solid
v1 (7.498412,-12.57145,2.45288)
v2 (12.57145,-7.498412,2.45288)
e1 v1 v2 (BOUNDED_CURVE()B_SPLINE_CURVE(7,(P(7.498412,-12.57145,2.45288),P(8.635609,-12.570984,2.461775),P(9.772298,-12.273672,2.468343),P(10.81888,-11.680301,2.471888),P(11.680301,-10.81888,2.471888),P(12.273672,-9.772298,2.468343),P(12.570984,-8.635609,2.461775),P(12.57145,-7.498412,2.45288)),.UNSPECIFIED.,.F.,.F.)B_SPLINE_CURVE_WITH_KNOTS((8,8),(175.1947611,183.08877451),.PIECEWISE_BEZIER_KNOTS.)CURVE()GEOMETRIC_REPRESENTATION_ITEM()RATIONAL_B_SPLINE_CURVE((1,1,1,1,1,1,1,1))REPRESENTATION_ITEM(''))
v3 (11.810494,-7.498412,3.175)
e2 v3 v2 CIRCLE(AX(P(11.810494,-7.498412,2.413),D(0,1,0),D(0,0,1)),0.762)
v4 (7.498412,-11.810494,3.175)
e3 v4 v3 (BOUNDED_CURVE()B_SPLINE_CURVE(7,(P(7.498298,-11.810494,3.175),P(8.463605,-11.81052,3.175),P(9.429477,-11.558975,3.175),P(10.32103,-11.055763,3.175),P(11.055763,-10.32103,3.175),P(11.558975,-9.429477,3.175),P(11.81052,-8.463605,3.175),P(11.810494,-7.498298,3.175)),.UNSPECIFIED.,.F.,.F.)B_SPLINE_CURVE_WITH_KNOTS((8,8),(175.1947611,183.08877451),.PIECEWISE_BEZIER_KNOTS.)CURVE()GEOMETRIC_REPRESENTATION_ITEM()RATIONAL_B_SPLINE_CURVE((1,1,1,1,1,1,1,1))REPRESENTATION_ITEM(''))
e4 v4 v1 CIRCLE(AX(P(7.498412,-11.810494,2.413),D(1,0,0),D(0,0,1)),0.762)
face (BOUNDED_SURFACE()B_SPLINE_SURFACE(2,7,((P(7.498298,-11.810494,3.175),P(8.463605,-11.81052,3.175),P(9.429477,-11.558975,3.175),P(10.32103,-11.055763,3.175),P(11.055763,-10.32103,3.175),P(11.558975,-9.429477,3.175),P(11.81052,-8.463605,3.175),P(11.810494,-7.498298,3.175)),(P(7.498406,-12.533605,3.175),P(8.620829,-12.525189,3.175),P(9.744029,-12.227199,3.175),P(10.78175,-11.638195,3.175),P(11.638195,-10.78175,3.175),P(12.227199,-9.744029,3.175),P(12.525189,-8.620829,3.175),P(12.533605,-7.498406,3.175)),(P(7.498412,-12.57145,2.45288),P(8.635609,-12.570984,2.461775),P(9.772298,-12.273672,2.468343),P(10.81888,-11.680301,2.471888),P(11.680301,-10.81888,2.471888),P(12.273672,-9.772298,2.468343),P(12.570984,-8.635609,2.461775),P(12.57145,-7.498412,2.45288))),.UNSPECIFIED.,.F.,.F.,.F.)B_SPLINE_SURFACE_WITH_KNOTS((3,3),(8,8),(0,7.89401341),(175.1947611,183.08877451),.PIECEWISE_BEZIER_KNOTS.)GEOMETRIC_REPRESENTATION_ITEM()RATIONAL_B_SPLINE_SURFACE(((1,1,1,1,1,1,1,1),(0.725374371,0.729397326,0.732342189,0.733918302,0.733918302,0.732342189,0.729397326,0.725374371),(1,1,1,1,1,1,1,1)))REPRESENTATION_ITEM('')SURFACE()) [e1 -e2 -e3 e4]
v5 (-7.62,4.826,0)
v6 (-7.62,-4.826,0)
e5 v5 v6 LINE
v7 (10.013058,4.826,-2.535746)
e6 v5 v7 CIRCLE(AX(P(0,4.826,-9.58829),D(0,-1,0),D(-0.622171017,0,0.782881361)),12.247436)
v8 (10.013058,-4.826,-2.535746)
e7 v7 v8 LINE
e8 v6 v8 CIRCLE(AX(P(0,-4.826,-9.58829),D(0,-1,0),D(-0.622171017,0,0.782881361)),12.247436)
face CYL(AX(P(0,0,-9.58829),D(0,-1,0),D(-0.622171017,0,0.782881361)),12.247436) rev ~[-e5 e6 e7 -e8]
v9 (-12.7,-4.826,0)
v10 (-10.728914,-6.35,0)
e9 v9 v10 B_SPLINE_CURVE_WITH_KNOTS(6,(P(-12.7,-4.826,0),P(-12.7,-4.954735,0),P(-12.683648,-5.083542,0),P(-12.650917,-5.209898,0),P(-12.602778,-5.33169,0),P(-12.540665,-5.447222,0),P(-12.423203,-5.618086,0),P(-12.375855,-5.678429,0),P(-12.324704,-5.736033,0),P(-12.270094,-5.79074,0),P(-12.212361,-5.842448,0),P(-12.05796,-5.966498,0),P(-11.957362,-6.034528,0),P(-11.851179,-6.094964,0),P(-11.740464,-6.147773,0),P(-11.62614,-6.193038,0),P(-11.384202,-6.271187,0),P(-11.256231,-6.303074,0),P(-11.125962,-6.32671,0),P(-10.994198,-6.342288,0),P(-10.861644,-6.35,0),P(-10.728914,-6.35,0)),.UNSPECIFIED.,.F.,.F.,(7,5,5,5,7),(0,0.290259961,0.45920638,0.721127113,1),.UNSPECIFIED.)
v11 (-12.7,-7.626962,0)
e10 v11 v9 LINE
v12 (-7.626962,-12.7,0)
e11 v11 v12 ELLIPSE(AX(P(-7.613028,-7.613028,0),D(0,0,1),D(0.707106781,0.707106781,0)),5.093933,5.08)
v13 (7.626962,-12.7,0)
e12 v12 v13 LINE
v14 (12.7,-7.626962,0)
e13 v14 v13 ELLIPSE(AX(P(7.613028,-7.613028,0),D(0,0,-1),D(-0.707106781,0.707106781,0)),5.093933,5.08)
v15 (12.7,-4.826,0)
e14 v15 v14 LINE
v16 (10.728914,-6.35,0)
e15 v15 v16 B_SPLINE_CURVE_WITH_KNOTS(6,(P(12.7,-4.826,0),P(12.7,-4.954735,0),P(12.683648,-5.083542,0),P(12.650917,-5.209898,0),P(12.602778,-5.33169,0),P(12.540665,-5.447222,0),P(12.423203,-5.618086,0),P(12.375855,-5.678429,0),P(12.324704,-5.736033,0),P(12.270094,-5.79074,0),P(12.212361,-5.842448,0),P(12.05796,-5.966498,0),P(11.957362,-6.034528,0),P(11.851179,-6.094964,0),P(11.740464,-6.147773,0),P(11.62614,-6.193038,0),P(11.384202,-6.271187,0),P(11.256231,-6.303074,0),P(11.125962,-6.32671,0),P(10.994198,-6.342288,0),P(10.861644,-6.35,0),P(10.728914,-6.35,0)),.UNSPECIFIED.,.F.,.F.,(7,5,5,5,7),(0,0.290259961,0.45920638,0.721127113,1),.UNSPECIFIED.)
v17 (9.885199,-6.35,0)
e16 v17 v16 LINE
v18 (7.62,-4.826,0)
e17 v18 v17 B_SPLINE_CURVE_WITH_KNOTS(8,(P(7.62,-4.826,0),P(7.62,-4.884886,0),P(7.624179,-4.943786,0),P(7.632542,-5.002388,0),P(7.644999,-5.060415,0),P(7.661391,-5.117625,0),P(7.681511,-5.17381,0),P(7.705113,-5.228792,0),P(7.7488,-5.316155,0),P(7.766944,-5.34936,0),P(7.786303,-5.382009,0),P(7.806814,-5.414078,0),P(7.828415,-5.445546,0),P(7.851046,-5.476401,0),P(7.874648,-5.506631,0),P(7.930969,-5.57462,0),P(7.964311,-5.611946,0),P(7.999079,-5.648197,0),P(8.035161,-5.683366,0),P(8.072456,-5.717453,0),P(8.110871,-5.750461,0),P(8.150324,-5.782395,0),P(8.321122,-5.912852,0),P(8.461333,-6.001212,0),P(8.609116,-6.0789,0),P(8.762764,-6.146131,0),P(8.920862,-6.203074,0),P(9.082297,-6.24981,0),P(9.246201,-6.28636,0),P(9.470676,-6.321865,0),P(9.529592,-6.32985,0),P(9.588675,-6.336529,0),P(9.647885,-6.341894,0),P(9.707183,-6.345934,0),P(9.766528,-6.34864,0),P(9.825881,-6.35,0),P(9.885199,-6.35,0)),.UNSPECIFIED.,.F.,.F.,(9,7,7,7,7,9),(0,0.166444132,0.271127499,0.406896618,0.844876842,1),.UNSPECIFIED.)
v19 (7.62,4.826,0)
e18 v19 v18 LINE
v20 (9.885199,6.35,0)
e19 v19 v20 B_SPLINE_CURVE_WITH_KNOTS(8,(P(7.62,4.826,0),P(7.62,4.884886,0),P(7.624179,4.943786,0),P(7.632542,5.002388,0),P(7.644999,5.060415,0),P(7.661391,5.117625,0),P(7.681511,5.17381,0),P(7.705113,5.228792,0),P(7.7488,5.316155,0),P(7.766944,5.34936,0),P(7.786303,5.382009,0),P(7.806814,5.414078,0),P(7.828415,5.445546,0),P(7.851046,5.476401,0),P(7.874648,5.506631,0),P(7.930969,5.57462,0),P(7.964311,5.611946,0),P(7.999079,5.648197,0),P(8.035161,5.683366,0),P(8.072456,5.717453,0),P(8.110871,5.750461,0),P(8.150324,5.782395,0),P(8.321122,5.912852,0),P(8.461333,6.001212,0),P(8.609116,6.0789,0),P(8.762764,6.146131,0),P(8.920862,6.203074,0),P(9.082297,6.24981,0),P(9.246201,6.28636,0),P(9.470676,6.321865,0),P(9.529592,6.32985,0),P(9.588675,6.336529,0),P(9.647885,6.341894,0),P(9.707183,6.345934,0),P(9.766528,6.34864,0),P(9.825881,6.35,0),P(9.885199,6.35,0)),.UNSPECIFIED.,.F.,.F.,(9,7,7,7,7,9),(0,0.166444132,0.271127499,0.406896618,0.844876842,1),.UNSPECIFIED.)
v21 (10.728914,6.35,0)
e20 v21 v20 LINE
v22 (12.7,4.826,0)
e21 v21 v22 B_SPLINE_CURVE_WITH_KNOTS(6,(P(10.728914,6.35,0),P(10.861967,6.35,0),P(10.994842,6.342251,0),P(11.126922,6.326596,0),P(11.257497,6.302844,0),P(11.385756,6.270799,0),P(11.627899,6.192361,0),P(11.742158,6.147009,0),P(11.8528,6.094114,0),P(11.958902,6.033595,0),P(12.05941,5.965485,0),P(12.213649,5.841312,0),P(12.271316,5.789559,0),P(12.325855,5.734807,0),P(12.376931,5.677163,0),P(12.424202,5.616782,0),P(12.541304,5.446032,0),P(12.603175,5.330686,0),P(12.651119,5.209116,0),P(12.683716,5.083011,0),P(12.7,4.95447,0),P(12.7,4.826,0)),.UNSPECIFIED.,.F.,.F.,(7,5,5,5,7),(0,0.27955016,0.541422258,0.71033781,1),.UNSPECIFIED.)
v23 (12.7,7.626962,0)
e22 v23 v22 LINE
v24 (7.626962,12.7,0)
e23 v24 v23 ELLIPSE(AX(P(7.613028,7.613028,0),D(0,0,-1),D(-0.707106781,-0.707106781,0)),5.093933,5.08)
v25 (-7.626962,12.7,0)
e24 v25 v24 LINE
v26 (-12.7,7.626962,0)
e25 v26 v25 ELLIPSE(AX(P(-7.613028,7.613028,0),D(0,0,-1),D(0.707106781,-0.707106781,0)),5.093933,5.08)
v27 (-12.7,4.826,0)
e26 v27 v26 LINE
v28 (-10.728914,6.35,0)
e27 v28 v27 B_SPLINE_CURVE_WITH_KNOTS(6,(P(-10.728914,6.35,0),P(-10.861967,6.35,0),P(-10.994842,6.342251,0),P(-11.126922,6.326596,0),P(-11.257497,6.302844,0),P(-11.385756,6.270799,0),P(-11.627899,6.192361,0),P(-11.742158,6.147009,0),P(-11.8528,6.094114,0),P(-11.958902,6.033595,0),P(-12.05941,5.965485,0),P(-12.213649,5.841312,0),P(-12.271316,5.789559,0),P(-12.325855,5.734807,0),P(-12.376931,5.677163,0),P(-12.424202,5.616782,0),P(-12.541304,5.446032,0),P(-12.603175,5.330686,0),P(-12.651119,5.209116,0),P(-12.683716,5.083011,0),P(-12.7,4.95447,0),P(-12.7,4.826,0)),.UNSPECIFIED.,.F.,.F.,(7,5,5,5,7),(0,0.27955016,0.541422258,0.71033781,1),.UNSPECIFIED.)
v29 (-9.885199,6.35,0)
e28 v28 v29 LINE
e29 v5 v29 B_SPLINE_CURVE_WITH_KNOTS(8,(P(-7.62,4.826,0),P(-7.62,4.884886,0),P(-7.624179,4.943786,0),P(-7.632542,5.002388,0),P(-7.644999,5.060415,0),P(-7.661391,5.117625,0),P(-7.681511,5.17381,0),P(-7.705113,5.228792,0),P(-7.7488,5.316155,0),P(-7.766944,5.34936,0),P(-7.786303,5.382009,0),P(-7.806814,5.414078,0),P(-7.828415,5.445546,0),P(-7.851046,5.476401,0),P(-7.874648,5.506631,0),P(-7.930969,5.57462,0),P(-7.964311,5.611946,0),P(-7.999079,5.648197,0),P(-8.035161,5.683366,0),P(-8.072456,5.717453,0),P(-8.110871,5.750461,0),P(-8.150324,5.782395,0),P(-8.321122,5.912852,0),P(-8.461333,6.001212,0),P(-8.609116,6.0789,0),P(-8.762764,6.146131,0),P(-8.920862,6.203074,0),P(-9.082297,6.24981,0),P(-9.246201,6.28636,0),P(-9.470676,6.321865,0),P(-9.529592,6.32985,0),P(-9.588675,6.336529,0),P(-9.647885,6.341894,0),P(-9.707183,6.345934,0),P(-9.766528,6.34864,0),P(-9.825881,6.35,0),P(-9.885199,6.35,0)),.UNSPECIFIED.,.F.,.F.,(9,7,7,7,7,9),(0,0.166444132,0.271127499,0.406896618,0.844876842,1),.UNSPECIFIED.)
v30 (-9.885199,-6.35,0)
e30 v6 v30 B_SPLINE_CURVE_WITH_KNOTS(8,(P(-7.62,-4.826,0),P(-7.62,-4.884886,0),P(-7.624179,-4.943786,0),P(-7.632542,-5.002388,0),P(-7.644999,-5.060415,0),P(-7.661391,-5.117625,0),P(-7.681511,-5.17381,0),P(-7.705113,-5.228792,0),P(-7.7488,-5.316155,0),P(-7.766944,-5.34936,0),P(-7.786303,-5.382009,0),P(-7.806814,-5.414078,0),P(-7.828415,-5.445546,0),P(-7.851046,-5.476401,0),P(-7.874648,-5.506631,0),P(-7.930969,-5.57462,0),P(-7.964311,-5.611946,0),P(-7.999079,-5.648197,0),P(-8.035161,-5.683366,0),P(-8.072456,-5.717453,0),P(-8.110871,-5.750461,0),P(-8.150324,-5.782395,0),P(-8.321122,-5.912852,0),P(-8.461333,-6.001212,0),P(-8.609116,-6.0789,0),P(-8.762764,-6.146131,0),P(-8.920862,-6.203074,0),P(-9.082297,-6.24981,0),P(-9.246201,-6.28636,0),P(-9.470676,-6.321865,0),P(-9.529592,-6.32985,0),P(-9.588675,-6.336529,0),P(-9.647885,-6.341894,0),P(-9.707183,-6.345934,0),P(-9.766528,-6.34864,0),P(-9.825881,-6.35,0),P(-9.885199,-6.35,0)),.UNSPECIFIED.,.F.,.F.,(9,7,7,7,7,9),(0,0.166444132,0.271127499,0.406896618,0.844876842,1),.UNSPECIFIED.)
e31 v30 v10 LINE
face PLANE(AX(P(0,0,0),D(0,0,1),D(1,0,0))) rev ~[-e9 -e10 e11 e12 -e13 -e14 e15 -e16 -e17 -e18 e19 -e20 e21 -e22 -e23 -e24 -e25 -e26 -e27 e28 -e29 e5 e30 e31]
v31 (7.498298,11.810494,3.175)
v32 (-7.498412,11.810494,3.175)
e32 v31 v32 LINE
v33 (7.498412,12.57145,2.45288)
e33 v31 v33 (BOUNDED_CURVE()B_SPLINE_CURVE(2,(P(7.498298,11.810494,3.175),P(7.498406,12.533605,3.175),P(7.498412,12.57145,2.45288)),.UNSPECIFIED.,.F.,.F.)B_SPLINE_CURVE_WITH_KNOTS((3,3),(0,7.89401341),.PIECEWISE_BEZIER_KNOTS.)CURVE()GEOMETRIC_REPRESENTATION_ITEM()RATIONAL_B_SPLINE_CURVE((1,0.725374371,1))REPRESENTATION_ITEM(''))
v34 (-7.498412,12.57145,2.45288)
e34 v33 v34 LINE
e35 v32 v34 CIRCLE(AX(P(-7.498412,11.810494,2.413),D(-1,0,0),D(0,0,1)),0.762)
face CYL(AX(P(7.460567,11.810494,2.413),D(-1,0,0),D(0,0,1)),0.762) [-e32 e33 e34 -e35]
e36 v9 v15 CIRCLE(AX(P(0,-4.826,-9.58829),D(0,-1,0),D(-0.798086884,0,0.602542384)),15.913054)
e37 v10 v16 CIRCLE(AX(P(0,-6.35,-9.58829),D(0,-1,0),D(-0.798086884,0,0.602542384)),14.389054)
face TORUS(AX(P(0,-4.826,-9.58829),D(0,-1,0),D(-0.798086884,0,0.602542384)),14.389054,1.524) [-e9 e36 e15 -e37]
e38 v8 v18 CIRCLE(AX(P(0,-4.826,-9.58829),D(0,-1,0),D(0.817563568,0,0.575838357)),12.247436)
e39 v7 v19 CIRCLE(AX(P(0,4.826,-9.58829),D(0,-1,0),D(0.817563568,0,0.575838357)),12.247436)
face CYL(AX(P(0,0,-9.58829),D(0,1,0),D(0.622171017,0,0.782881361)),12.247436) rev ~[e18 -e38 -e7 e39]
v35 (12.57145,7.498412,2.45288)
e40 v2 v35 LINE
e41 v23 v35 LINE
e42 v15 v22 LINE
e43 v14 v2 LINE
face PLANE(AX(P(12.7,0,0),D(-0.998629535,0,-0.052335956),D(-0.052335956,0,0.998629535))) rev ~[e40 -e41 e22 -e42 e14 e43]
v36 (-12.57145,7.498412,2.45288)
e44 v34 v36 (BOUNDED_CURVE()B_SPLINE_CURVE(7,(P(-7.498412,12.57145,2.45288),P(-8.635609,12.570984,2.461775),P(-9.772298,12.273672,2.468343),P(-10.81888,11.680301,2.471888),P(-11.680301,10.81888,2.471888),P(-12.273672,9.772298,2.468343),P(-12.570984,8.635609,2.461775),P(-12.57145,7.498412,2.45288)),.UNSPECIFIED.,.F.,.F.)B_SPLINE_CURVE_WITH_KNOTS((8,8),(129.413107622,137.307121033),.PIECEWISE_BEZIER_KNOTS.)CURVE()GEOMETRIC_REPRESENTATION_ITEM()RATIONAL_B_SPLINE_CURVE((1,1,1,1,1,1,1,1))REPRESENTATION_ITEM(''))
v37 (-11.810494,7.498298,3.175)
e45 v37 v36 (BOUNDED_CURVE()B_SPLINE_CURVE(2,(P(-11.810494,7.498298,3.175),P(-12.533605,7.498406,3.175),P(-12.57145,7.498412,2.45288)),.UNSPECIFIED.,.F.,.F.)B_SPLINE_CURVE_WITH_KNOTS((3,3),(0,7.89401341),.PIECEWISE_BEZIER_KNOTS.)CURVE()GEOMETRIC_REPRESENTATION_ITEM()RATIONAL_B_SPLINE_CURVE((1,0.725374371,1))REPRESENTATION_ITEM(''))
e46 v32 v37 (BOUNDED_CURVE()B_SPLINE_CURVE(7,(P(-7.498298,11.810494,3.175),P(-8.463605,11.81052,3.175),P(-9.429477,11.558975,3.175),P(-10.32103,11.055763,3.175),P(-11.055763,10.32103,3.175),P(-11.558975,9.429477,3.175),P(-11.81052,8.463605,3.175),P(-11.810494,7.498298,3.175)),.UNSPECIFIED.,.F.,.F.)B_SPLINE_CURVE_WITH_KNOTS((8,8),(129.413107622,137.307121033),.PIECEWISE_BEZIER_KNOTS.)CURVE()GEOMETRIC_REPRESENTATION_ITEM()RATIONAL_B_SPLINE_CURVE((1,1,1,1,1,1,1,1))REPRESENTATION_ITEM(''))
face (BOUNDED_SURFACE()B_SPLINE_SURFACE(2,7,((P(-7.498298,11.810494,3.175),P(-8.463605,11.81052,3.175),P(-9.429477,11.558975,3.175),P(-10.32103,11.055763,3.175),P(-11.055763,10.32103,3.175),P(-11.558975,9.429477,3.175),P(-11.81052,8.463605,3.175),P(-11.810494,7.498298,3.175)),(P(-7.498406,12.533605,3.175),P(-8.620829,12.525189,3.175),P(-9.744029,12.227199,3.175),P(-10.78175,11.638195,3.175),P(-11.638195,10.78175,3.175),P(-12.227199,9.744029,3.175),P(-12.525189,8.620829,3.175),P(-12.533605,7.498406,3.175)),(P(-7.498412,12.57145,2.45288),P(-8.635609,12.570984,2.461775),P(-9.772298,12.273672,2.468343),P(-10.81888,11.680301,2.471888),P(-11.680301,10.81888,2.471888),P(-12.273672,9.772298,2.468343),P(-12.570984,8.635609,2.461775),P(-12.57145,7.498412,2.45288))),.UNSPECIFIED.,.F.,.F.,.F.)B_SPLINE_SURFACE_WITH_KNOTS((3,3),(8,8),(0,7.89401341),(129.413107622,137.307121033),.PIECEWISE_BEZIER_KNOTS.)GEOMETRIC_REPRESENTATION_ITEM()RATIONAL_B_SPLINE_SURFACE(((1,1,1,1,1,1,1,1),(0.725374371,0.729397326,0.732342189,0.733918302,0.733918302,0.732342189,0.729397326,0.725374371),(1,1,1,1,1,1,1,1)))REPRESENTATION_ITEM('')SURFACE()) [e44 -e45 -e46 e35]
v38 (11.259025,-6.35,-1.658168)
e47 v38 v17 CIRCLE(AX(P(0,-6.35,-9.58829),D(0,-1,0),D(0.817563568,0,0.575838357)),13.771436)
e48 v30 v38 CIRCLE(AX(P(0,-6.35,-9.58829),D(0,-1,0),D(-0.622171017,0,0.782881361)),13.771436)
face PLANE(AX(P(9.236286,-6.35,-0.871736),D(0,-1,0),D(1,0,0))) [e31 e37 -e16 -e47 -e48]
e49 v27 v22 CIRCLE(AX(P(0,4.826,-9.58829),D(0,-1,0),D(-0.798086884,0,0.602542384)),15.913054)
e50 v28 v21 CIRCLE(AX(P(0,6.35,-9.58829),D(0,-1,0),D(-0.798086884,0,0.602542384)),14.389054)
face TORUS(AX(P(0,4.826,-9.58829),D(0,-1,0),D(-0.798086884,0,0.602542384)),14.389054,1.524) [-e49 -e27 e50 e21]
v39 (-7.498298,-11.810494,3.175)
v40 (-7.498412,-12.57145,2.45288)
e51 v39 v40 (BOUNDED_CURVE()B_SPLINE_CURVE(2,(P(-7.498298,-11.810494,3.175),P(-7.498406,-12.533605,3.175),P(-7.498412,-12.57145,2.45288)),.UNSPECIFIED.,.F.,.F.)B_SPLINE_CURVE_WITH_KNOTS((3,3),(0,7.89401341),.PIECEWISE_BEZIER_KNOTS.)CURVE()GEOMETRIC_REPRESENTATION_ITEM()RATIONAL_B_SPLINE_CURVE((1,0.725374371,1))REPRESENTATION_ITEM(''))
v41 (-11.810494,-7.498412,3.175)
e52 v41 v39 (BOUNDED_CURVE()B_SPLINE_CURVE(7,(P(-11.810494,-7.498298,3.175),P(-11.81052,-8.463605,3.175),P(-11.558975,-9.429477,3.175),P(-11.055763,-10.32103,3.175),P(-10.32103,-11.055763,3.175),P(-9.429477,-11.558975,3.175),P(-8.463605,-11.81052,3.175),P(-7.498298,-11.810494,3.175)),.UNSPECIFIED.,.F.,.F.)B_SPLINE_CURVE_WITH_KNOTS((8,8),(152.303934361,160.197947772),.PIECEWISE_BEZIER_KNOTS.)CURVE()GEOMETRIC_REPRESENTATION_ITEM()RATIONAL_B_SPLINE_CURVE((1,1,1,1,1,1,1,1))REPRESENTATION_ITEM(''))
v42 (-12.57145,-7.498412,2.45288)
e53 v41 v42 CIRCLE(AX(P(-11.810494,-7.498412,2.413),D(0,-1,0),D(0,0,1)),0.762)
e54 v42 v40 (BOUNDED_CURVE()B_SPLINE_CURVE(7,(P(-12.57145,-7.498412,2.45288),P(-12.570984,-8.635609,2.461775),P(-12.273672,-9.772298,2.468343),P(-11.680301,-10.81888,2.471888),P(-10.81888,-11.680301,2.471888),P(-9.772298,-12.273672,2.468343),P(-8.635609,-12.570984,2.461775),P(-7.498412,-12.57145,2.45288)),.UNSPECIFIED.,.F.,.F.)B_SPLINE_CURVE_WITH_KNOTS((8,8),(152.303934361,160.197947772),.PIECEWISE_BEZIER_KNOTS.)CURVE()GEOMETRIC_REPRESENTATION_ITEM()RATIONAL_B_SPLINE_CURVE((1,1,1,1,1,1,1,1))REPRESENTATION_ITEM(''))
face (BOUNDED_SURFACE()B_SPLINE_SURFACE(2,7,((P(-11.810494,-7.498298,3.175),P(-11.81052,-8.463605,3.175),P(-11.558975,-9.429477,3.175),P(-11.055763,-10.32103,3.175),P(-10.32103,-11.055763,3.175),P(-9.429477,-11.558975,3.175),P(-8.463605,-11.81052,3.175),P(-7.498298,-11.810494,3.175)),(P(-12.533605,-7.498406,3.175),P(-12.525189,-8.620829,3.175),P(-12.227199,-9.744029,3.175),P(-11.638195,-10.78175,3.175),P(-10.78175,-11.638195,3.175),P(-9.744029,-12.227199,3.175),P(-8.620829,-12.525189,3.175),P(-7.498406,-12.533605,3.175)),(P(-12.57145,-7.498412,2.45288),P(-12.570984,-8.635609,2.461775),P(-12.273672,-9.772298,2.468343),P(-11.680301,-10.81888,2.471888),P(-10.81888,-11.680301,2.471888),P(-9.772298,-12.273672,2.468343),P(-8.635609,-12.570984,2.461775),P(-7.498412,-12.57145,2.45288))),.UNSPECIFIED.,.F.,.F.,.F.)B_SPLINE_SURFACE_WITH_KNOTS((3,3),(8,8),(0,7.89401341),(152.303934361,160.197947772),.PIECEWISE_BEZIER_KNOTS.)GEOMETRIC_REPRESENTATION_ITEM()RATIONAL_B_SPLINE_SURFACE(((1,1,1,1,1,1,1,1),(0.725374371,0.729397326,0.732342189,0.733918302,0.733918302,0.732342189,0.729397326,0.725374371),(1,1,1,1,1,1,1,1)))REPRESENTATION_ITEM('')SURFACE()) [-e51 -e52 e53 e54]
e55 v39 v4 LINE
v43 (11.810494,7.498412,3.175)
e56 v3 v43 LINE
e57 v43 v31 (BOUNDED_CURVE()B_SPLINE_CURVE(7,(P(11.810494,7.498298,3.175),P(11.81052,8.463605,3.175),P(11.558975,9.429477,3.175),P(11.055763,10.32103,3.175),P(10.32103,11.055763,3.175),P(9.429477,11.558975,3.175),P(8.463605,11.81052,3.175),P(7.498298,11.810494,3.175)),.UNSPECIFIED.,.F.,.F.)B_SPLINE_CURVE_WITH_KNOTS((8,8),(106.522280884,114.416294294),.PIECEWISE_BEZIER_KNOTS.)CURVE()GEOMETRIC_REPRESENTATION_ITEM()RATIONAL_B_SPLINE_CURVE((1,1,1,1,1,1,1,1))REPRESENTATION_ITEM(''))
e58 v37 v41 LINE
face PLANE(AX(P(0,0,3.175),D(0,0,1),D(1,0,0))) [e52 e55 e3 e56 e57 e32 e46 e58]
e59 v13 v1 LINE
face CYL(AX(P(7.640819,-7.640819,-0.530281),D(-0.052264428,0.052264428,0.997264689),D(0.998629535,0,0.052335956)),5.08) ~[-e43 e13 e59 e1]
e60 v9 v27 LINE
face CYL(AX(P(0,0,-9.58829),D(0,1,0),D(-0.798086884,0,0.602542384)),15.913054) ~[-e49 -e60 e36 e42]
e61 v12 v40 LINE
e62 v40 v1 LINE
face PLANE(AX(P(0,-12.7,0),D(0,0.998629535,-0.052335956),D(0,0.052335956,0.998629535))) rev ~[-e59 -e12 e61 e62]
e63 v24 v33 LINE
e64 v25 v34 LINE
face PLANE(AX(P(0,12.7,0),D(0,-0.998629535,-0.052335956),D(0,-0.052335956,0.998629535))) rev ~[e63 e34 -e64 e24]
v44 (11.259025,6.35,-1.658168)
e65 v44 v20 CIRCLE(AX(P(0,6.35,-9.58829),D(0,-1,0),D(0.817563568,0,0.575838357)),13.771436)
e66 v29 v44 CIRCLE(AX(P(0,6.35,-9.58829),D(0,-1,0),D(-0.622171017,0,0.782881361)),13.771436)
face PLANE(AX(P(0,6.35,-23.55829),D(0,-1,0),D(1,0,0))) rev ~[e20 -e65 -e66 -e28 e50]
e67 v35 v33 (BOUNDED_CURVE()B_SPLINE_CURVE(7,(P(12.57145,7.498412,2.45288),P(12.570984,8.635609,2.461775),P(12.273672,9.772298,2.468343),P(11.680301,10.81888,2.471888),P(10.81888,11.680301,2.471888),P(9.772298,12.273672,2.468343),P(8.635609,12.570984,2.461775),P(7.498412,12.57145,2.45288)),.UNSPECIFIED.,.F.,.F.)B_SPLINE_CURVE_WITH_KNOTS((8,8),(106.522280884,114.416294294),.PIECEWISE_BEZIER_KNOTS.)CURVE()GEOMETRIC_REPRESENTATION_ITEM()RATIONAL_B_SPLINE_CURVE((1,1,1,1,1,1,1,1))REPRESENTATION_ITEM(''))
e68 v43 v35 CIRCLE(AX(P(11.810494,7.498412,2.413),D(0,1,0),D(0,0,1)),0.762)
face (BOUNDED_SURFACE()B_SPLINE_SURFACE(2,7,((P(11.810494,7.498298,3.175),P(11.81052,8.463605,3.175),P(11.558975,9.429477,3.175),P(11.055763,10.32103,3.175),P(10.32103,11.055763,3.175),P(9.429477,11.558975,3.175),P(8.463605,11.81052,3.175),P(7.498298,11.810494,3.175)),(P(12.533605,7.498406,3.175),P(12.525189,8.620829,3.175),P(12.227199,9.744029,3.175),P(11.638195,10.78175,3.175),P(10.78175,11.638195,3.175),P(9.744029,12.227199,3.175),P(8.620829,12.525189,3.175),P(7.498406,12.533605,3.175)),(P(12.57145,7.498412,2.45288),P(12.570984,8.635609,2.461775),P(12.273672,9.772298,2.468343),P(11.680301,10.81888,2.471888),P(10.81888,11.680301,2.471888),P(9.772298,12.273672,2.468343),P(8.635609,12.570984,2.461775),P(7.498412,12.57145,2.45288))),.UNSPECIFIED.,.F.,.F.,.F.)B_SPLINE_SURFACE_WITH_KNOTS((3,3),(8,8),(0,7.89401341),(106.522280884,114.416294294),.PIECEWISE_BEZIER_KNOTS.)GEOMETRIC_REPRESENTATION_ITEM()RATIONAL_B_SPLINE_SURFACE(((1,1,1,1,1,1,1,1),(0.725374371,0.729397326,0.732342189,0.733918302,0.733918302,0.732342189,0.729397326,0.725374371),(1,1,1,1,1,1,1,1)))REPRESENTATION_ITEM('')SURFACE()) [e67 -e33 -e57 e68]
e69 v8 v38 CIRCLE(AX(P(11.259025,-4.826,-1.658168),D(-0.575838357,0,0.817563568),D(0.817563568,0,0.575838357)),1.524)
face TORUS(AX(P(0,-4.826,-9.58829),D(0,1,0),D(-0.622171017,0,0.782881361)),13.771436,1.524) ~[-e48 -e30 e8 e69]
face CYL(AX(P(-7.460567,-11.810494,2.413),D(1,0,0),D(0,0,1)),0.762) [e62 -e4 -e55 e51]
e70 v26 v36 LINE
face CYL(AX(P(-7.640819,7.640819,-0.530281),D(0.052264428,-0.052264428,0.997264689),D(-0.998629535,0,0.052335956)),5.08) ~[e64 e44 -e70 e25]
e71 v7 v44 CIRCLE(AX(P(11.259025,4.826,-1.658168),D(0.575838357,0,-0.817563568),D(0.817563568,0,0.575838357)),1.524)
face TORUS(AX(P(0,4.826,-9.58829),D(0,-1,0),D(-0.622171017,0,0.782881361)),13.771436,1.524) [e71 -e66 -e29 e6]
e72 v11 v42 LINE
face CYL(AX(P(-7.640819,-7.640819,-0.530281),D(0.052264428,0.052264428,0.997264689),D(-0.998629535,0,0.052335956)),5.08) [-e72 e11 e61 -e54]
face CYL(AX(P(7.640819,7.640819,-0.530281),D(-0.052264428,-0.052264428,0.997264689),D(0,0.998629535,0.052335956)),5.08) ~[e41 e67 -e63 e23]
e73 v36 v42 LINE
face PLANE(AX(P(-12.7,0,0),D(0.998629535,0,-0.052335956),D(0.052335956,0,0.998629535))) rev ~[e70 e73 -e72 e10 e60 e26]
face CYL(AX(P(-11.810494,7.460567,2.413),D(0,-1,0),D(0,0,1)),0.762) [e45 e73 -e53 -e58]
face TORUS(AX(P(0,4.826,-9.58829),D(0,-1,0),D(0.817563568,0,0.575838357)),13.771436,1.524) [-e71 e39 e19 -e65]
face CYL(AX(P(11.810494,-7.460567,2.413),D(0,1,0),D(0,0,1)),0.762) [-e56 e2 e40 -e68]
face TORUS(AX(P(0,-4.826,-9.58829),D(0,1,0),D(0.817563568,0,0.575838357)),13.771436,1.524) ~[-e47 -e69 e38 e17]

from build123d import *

# Parameters (mm, degrees)
F0_W          = 25.4
F0_H          = 25.4
F1_DEPTH      = 3.175
F1_TAPER      = 3
F3_W          = 5.08
F3_H          = 12.7
F6_DEPTH      = 6.35
F6_DEPTH_BACK = 6.35
F7_R          = 5.08
F8_R          = 1.524
F9_R          = 0.762


with BuildPart() as f1:
    # F0 (on Top) → F1 (new body)
    with BuildSketch(Plane.XY):
        Rectangle(F0_W, F0_H)
    extrude(amount=F1_DEPTH, taper=F1_TAPER)

    # F4: sweep along a path in F2
    with BuildLine(Plane.XZ) as f4_path:
        ThreePointArc((-10.16, 0), (0, -23.5582897328), (10.16, 0))
    # F3 (on face) → F4 (sweep)
    with BuildSketch(Plane(origin=(0, 0, 0), x_dir=(1, 0, 0), z_dir=(0, 0, -1))):
        with Locations((-10.16, 0)):
            Rectangle(F3_W, F3_H)
    sweep(path=f4_path.line)

    # F5 (on Front) → F6 (join, two sides)
    with BuildSketch(Plane.XZ) as f6_sk:
        with BuildLine():
            ThreePointArc((7.62, 0), (8.9072265211, -1.1822790439), (10.0130578512, -2.535746045))
            Line((10.0130578512, -2.535746045), (10.16, 0))
            Line((10.16, 0), (7.62, 0))
        make_face()
    extrude(amount=F6_DEPTH)
    extrude(f6_sk.sketch, amount=-F6_DEPTH_BACK)

    # F7
    f7_edges = [f1.edges().sort_by_distance(p)[0] for p in [
        (12.616803, -12.616803, 1.5875),
        (-12.616803, -12.616803, 1.5875),
        (-12.616803, 12.616803, 1.5875),
        (12.616803, 12.616803, 1.5875),
    ]]
    fillet(f7_edges, radius=F7_R)

    # F8
    f8_edges = [f1.edges().sort_by_distance(p)[0] for p in [
        (-1.743325, 6.35, -21.711017),
        (-1.743325, -6.35, -21.711017),
        (8.907227, -6.35, -1.182279),
        (0, -6.35, -25.501344),
        (0, 6.35, -25.501344),
        (8.907227, 6.35, -1.182279),
    ]]
    fillet(f8_edges, radius=F8_R)

    # F9
    f9_edges = [f1.edges().sort_by_distance(p)[0] for p in [
        (12.533605, 0, 3.175),
        (11.048589, -11.048589, 3.175),
        (11.048589, 11.048589, 3.175),
        (0, -12.533605, 3.175),
        (0, 12.533605, 3.175),
        (-11.048589, -11.048589, 3.175),
        (-11.048589, 11.048589, 3.175),
        (-12.533605, 0, 3.175),
    ]]
    fillet(f9_edges, radius=F9_R)


solid = f1.part
